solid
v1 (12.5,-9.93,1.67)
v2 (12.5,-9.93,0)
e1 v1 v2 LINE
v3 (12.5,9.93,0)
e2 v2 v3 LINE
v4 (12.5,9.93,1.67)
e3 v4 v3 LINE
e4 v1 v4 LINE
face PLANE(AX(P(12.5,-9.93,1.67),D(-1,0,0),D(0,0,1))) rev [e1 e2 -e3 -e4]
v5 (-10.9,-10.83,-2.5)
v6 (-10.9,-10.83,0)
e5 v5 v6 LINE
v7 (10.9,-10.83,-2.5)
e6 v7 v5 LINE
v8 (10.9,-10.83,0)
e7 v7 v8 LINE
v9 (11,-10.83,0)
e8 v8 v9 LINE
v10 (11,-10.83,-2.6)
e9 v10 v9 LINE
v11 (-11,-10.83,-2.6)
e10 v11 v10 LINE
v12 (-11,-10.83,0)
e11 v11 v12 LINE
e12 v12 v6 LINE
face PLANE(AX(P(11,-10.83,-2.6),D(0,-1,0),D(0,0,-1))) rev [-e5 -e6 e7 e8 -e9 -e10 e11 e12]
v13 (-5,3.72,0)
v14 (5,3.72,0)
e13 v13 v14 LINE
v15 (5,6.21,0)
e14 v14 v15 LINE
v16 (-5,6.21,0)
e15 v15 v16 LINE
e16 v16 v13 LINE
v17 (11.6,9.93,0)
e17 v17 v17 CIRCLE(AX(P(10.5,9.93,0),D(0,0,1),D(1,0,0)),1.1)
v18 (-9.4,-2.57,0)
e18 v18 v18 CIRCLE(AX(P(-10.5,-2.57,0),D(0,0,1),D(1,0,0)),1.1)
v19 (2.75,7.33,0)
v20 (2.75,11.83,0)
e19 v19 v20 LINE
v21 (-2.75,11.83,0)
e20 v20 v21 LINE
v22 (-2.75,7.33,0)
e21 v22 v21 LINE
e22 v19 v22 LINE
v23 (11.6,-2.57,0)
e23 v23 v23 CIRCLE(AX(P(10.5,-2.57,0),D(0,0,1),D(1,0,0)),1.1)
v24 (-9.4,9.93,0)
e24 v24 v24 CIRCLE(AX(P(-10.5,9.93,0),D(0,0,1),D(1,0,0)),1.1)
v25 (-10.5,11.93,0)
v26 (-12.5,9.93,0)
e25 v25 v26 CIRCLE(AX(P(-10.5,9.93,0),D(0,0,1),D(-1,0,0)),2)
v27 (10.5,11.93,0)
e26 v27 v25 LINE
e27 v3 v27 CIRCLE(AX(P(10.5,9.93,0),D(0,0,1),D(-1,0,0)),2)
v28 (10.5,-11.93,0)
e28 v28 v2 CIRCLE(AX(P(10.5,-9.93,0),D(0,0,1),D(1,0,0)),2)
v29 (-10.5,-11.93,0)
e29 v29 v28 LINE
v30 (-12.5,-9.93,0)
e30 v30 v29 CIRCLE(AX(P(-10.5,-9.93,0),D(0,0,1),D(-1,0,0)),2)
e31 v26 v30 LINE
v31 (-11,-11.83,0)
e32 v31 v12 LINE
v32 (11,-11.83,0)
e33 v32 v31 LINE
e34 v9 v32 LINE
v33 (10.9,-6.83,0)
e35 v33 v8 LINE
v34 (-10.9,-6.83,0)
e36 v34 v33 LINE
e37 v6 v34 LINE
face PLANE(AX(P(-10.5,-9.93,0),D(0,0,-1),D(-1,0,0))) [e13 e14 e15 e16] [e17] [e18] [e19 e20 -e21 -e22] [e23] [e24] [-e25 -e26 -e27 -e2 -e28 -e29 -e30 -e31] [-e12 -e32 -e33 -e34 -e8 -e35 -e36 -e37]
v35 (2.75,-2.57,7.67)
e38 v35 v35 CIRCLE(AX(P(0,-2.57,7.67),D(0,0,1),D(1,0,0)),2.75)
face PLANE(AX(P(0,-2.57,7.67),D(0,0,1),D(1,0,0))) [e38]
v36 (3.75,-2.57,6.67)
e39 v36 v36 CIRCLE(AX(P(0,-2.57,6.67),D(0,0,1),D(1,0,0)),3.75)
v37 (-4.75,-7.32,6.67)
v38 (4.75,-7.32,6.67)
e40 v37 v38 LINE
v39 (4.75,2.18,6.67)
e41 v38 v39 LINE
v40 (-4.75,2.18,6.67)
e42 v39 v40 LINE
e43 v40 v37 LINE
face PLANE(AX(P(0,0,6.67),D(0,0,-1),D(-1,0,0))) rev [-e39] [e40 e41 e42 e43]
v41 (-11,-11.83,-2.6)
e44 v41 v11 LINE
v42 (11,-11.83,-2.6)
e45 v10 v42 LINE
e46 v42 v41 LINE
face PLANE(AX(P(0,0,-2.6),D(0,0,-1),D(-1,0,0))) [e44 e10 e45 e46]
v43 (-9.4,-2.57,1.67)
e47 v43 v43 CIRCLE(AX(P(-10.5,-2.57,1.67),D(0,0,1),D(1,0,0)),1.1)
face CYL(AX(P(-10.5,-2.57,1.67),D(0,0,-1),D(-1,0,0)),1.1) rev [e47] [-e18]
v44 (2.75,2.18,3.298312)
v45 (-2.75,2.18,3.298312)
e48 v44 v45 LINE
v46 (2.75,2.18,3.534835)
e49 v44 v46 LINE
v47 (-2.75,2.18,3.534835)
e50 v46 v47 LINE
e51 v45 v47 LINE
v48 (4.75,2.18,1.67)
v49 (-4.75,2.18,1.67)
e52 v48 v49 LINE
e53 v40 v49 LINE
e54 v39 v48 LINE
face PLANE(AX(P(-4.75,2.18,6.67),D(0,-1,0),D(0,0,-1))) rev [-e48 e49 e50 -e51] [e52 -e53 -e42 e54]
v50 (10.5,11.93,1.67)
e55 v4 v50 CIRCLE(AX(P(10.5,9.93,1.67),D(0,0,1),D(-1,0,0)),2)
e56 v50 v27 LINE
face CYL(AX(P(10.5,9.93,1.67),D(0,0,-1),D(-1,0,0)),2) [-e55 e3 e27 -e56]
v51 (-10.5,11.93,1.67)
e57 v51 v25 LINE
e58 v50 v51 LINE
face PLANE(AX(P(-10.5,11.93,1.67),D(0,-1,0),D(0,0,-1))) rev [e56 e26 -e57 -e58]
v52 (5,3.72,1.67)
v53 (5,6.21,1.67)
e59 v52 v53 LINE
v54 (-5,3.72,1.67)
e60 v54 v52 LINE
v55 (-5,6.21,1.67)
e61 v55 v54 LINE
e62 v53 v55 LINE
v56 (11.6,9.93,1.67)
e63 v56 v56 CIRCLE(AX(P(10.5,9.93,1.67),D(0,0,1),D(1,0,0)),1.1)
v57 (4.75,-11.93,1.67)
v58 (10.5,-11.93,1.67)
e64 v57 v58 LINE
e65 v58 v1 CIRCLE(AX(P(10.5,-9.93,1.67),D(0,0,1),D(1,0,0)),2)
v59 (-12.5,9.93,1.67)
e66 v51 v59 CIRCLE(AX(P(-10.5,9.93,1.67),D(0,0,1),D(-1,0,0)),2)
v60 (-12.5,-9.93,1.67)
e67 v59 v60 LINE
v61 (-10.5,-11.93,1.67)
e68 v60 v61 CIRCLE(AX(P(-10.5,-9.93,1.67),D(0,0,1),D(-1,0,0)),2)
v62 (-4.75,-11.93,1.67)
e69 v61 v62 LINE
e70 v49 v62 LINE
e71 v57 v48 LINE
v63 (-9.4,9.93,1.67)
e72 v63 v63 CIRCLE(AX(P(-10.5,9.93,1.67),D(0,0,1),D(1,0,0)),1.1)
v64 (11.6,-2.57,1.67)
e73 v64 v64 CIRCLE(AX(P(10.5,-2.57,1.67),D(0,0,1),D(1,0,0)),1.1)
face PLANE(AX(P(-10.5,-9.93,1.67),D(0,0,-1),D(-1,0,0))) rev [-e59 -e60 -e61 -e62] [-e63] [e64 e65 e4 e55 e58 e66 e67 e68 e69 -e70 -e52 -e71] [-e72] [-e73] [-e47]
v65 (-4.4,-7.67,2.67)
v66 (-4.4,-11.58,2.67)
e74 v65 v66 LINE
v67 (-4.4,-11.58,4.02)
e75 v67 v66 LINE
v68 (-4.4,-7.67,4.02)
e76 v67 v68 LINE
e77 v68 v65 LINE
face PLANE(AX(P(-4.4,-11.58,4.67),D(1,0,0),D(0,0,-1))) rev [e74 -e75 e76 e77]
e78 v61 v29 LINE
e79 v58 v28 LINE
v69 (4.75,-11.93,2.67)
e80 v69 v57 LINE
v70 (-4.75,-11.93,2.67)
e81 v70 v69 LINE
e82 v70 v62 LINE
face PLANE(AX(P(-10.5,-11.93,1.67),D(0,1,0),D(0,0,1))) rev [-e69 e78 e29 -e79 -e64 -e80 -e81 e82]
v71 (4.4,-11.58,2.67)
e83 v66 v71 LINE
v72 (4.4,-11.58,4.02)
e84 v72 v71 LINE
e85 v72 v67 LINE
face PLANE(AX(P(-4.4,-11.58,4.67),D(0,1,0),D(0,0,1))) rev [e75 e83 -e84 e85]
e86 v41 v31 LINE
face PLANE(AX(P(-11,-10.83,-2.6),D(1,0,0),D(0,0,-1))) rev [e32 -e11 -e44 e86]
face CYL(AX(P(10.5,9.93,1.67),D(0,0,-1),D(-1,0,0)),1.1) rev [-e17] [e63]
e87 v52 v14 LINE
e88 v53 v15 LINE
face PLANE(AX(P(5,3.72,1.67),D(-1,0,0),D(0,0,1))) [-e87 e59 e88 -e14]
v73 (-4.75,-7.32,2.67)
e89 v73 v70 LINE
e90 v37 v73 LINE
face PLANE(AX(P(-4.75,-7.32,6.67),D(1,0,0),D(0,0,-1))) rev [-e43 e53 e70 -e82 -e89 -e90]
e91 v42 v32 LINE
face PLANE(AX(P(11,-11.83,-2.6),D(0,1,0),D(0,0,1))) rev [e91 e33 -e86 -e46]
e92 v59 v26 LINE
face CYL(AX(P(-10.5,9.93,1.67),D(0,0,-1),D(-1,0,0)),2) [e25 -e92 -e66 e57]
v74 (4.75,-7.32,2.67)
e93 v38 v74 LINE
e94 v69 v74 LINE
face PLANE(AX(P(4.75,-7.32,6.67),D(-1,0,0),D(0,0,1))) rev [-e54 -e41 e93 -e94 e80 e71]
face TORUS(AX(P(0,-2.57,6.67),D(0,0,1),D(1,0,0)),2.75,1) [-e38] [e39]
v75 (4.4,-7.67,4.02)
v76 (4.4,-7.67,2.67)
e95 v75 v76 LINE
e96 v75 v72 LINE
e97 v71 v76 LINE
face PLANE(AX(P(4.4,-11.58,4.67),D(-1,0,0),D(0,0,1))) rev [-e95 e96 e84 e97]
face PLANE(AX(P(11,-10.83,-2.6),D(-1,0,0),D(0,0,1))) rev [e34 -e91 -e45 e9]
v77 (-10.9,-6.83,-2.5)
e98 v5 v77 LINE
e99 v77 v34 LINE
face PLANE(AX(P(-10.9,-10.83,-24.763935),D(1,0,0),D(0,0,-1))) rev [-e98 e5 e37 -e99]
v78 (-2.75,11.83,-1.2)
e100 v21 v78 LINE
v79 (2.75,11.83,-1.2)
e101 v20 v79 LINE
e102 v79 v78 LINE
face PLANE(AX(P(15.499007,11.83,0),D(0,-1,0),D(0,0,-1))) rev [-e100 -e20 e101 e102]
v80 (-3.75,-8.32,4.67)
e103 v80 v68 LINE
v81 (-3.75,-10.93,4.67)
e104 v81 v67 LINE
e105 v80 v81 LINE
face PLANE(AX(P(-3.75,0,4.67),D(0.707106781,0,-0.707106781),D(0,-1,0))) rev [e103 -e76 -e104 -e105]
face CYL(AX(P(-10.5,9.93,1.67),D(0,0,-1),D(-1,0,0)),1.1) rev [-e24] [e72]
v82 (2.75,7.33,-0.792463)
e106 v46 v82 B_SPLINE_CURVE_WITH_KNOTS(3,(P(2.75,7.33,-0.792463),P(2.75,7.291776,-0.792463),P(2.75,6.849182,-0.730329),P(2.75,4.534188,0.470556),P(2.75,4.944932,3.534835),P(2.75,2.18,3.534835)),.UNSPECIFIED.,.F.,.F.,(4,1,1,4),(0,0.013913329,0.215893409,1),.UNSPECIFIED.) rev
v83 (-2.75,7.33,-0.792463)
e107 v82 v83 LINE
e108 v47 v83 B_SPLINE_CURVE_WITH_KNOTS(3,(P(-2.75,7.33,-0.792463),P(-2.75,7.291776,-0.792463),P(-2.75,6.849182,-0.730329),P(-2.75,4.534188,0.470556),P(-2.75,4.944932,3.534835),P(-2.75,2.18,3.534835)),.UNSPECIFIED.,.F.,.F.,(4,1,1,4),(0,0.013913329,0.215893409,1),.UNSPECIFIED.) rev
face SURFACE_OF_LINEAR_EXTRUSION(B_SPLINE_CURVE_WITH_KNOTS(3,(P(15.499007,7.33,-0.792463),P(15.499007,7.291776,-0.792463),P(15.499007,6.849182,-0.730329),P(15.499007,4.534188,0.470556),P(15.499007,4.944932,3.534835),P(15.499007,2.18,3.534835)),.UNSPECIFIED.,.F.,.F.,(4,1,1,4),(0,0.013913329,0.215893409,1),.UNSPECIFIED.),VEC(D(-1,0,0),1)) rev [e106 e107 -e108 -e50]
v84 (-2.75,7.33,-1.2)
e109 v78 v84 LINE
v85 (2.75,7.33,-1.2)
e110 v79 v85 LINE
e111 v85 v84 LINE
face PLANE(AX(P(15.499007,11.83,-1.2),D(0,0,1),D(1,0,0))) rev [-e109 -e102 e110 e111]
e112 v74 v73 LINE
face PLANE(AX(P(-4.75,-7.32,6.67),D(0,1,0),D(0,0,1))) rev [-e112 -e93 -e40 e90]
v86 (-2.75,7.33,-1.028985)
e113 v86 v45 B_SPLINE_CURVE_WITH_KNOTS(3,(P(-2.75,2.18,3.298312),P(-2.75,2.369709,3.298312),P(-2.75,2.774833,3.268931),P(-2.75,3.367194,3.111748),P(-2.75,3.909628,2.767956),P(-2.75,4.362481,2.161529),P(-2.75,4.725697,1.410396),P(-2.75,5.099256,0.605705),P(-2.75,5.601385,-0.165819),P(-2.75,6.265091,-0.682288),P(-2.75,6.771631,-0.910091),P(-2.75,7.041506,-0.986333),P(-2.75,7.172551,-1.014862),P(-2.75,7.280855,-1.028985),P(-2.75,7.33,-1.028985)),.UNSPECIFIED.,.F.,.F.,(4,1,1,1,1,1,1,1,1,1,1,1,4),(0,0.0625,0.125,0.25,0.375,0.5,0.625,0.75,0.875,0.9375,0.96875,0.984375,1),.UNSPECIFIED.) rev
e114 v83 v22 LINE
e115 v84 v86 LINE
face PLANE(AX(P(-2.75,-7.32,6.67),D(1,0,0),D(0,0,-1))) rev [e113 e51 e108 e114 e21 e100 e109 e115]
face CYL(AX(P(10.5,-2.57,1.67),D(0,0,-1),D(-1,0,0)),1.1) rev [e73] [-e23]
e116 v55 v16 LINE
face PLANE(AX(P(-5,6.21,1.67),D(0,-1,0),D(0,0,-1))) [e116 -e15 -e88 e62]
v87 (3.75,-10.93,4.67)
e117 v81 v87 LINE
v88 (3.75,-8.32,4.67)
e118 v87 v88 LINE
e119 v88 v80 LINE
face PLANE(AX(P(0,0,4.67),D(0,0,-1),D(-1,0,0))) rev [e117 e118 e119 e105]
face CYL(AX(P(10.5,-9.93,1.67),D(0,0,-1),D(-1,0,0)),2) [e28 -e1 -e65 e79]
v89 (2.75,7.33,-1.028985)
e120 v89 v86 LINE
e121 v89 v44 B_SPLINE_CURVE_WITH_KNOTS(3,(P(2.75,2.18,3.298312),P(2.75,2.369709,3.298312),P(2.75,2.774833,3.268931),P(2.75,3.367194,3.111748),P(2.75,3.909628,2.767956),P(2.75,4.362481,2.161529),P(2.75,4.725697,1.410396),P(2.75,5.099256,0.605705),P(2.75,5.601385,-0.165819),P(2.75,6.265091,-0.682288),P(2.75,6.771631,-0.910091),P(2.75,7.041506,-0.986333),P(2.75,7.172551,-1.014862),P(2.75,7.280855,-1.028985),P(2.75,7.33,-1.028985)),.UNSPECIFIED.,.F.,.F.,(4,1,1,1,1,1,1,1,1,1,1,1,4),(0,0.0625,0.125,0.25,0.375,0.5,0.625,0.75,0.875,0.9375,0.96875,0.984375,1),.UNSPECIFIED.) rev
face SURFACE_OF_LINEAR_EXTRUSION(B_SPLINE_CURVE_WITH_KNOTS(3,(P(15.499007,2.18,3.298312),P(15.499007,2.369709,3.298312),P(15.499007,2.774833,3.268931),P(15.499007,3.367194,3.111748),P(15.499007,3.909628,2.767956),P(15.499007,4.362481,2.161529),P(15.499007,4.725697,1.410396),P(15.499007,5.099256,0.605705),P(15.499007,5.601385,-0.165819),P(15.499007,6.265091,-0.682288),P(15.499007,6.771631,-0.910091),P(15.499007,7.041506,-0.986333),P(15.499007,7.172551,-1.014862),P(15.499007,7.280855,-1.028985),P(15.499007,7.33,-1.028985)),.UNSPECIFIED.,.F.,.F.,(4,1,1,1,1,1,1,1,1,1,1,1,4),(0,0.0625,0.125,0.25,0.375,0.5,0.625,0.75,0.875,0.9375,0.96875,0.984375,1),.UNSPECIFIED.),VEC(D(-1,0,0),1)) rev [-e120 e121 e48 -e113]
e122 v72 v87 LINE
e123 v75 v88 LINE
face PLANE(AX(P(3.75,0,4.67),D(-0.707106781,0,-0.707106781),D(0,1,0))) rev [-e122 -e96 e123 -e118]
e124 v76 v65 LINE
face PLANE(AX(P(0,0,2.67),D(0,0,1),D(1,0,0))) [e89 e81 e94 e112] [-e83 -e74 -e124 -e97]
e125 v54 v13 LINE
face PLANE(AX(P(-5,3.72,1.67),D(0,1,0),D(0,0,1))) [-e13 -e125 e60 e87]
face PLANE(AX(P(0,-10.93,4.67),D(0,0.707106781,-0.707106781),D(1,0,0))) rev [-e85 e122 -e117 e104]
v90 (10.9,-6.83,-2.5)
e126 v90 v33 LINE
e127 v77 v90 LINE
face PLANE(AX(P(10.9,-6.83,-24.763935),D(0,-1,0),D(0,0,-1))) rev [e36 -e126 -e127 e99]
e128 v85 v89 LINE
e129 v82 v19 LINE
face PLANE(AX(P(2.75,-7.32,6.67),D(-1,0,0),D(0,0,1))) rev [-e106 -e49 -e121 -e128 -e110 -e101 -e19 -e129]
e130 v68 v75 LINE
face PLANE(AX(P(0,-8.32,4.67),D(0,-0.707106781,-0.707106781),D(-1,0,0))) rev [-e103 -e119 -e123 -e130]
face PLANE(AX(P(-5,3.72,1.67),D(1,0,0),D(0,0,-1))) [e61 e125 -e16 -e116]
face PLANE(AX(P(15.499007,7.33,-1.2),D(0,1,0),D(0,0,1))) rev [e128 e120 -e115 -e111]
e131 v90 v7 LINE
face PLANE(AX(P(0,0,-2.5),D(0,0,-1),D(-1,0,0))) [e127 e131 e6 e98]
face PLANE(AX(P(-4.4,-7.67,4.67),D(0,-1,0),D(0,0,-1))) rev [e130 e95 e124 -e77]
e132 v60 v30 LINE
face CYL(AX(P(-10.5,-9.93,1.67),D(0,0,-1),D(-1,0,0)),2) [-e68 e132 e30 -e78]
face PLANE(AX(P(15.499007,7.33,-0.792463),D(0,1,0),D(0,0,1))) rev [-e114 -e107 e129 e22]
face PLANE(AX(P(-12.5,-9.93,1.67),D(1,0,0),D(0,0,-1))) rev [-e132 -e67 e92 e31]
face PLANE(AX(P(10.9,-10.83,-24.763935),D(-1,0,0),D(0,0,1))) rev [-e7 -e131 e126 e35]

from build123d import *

# Parameters (mm, degrees)
SKETCH1_R                = 1.1
SKETCH1_W                = 10
SKETCH1_H                = 2.49
BOSS_EXTRUDE1_DEPTH      = 1.67
SKETCH2_W                = 9.5
SKETCH2_H                = 9.5
BOSS_EXTRUDE2_DEPTH      = 5
SKETCH3_R                = 3.75
BOSS_EXTRUDE3_DEPTH      = 1
FILLET1_R                = 1
SKETCH4_W                = 9.5
SKETCH4_H                = 4.61
BOSS_EXTRUDE4_DEPTH      = 1
SKETCH5_W                = 8.8
SKETCH5_H                = 3.91
BOSS_EXTRUDE5_DEPTH      = 2
CHAMFER1_SIZE            = 0.65
BOSS_EXTRUDE6_DEPTH      = 2.75
BOSS_EXTRUDE6_DEPTH_BACK = 2.75
SKETCH7_W                = 22
SKETCH7_H                = 1
BOSS_EXTRUDE7_DEPTH      = 2.6
SKETCH9_W                = 21.8
SKETCH9_H                = 4
BOSS_EXTRUDE8_DEPTH      = 2.5


with BuildPart() as part:
    # Sketch1 → Boss-Extrude1 (new body)
    with BuildSketch(Plane.XY):
        with BuildLine():
            Line((-10.5, -11.93), (10.5, -11.93))
            ThreePointArc((10.5, -11.93), (11.914213562, -11.344213562), (12.5, -9.93))
            Line((12.5, -9.93), (12.5, 9.93))
            ThreePointArc((12.5, 9.93), (11.914213562, 11.344213562), (10.5, 11.93))
            Line((10.5, 11.93), (-10.5, 11.93))
            ThreePointArc((-10.5, 11.93), (-11.914213562, 11.344213562), (-12.5, 9.93))
            Line((-12.5, 9.93), (-12.5, -9.93))
            ThreePointArc((-12.5, -9.93), (-11.914213562, -11.344213562), (-10.5, -11.93))
        make_face()
        with Locations((-10.5, 9.93)):
            Circle(SKETCH1_R, mode=Mode.SUBTRACT)
        with Locations((10.5, 9.93)):
            Circle(SKETCH1_R, mode=Mode.SUBTRACT)
        with Locations((-10.5, -2.57)):
            Circle(SKETCH1_R, mode=Mode.SUBTRACT)
        with Locations((10.5, -2.57)):
            Circle(SKETCH1_R, mode=Mode.SUBTRACT)
        with Locations((0, 4.965)):
            Rectangle(SKETCH1_W, SKETCH1_H, mode=Mode.SUBTRACT)
    extrude(amount=BOSS_EXTRUDE1_DEPTH)

    # Sketch2 → Boss-Extrude2 (add)
    with BuildSketch(Plane.XY.offset(1.67)):
        with Locations((0, -2.57)):
            Rectangle(SKETCH2_W, SKETCH2_H)
    extrude(amount=BOSS_EXTRUDE2_DEPTH)

    # Sketch3 → Boss-Extrude3 (add)
    with BuildSketch(Plane.XY.offset(6.67)):
        with Locations((0, -2.57)):
            Circle(SKETCH3_R)
    extrude(amount=BOSS_EXTRUDE3_DEPTH)

    # Fillet1
    fillet1_edges = [part.edges().sort_by_distance(p)[0] for p in [
        (-3.75, -2.57, 7.67),
    ]]
    fillet(fillet1_edges, radius=FILLET1_R - 0.0001)  # a hair under: the kernel refuses the full size

    # Sketch4 → Boss-Extrude4 (add)
    with BuildSketch(Plane.XY.offset(1.67)):
        with Locations((0, -9.625)):
            Rectangle(SKETCH4_W, SKETCH4_H)
    extrude(amount=BOSS_EXTRUDE4_DEPTH)

    # Sketch5 → Boss-Extrude5 (add)
    with BuildSketch(Plane.XY.offset(2.67)):
        with Locations((0, -9.625)):
            Rectangle(SKETCH5_W, SKETCH5_H)
    extrude(amount=BOSS_EXTRUDE5_DEPTH)

    # Chamfer1
    chamfer1_edges = [part.edges().sort_by_distance(p)[0] for p in [
        (4.4, -9.625, 4.67),
        (0, -7.67, 4.67),
        (-4.4, -9.625, 4.67),
        (0, -11.58, 4.67),
    ]]
    chamfer(chamfer1_edges, length=CHAMFER1_SIZE)

    # Sketch6 → Boss-Extrude6 (add, two sides: drawn at the far end of the back side and taken through both)
    with BuildSketch(Plane(origin=(0, 0, 0), x_dir=(0, 0, -1), z_dir=(1, 0, 0)).offset(-BOSS_EXTRUDE6_DEPTH_BACK)):
        with BuildLine():
            Line((-3.298312235, 2.18), (-3.534834551, 2.18))
            add(Edge.make_bspline(
                [(-3.534834551, 2.18), (-3.534834551, 4.944931667), (-0.47055609, 4.534187875), (0.730328755, 6.849182289), (0.79246314, 7.291776262), (0.79246314, 7.33)],
                knots=[0, 0, 0, 0, 0.784106591, 0.986086671, 1, 1, 1, 1], degree=3))
            Line((0.79246314, 7.33), (0, 7.33))
            Line((0, 7.33), (0, 11.83))
            Line((0, 11.83), (1.2, 11.83))
            Line((1.2, 11.83), (1.2, 7.33))
            Line((1.2, 7.33), (1.028985456, 7.33))
            add(Edge.make_bspline(
                [(-3.298312235, 2.18), (-3.298312235, 2.369708531), (-3.268931161, 2.774833109), (-3.111748266, 3.367193807), (-2.767956088, 3.909628415), (-2.161529025, 4.362480865), (-1.410396471, 4.725696596), (-0.605704822, 5.099255509), (0.165819225, 5.601384629), (0.682287807, 6.265090703), (0.910091228, 6.771630764), (0.98633259, 7.041505733), (1.014862156, 7.172550739), (1.028985456, 7.28085491), (1.028985456, 7.33)],
                knots=[0, 0, 0, 0, 0.0625, 0.125, 0.25, 0.375, 0.5, 0.625, 0.75, 0.875, 0.9375, 0.96875, 0.984375, 1, 1, 1, 1], degree=3))
        make_face()
    extrude(amount=BOSS_EXTRUDE6_DEPTH + BOSS_EXTRUDE6_DEPTH_BACK)

    # Sketch7 → Boss-Extrude7 (add)
    with BuildSketch(Plane(origin=(0, 0, 0), x_dir=(-1, 0, 0), z_dir=(0, 0, -1))):
        with Locations((0, -11.33)):
            Rectangle(SKETCH7_W, SKETCH7_H)
    extrude(amount=BOSS_EXTRUDE7_DEPTH)

    # Sketch9 → Boss-Extrude8 (add)
    with BuildSketch(Plane(origin=(0, 0, 0), x_dir=(-1, 0, 0), z_dir=(0, 0, -1))):
        with Locations((0, -8.83)):
            Rectangle(SKETCH9_W, SKETCH9_H)
    extrude(amount=BOSS_EXTRUDE8_DEPTH)


solid = part.part
